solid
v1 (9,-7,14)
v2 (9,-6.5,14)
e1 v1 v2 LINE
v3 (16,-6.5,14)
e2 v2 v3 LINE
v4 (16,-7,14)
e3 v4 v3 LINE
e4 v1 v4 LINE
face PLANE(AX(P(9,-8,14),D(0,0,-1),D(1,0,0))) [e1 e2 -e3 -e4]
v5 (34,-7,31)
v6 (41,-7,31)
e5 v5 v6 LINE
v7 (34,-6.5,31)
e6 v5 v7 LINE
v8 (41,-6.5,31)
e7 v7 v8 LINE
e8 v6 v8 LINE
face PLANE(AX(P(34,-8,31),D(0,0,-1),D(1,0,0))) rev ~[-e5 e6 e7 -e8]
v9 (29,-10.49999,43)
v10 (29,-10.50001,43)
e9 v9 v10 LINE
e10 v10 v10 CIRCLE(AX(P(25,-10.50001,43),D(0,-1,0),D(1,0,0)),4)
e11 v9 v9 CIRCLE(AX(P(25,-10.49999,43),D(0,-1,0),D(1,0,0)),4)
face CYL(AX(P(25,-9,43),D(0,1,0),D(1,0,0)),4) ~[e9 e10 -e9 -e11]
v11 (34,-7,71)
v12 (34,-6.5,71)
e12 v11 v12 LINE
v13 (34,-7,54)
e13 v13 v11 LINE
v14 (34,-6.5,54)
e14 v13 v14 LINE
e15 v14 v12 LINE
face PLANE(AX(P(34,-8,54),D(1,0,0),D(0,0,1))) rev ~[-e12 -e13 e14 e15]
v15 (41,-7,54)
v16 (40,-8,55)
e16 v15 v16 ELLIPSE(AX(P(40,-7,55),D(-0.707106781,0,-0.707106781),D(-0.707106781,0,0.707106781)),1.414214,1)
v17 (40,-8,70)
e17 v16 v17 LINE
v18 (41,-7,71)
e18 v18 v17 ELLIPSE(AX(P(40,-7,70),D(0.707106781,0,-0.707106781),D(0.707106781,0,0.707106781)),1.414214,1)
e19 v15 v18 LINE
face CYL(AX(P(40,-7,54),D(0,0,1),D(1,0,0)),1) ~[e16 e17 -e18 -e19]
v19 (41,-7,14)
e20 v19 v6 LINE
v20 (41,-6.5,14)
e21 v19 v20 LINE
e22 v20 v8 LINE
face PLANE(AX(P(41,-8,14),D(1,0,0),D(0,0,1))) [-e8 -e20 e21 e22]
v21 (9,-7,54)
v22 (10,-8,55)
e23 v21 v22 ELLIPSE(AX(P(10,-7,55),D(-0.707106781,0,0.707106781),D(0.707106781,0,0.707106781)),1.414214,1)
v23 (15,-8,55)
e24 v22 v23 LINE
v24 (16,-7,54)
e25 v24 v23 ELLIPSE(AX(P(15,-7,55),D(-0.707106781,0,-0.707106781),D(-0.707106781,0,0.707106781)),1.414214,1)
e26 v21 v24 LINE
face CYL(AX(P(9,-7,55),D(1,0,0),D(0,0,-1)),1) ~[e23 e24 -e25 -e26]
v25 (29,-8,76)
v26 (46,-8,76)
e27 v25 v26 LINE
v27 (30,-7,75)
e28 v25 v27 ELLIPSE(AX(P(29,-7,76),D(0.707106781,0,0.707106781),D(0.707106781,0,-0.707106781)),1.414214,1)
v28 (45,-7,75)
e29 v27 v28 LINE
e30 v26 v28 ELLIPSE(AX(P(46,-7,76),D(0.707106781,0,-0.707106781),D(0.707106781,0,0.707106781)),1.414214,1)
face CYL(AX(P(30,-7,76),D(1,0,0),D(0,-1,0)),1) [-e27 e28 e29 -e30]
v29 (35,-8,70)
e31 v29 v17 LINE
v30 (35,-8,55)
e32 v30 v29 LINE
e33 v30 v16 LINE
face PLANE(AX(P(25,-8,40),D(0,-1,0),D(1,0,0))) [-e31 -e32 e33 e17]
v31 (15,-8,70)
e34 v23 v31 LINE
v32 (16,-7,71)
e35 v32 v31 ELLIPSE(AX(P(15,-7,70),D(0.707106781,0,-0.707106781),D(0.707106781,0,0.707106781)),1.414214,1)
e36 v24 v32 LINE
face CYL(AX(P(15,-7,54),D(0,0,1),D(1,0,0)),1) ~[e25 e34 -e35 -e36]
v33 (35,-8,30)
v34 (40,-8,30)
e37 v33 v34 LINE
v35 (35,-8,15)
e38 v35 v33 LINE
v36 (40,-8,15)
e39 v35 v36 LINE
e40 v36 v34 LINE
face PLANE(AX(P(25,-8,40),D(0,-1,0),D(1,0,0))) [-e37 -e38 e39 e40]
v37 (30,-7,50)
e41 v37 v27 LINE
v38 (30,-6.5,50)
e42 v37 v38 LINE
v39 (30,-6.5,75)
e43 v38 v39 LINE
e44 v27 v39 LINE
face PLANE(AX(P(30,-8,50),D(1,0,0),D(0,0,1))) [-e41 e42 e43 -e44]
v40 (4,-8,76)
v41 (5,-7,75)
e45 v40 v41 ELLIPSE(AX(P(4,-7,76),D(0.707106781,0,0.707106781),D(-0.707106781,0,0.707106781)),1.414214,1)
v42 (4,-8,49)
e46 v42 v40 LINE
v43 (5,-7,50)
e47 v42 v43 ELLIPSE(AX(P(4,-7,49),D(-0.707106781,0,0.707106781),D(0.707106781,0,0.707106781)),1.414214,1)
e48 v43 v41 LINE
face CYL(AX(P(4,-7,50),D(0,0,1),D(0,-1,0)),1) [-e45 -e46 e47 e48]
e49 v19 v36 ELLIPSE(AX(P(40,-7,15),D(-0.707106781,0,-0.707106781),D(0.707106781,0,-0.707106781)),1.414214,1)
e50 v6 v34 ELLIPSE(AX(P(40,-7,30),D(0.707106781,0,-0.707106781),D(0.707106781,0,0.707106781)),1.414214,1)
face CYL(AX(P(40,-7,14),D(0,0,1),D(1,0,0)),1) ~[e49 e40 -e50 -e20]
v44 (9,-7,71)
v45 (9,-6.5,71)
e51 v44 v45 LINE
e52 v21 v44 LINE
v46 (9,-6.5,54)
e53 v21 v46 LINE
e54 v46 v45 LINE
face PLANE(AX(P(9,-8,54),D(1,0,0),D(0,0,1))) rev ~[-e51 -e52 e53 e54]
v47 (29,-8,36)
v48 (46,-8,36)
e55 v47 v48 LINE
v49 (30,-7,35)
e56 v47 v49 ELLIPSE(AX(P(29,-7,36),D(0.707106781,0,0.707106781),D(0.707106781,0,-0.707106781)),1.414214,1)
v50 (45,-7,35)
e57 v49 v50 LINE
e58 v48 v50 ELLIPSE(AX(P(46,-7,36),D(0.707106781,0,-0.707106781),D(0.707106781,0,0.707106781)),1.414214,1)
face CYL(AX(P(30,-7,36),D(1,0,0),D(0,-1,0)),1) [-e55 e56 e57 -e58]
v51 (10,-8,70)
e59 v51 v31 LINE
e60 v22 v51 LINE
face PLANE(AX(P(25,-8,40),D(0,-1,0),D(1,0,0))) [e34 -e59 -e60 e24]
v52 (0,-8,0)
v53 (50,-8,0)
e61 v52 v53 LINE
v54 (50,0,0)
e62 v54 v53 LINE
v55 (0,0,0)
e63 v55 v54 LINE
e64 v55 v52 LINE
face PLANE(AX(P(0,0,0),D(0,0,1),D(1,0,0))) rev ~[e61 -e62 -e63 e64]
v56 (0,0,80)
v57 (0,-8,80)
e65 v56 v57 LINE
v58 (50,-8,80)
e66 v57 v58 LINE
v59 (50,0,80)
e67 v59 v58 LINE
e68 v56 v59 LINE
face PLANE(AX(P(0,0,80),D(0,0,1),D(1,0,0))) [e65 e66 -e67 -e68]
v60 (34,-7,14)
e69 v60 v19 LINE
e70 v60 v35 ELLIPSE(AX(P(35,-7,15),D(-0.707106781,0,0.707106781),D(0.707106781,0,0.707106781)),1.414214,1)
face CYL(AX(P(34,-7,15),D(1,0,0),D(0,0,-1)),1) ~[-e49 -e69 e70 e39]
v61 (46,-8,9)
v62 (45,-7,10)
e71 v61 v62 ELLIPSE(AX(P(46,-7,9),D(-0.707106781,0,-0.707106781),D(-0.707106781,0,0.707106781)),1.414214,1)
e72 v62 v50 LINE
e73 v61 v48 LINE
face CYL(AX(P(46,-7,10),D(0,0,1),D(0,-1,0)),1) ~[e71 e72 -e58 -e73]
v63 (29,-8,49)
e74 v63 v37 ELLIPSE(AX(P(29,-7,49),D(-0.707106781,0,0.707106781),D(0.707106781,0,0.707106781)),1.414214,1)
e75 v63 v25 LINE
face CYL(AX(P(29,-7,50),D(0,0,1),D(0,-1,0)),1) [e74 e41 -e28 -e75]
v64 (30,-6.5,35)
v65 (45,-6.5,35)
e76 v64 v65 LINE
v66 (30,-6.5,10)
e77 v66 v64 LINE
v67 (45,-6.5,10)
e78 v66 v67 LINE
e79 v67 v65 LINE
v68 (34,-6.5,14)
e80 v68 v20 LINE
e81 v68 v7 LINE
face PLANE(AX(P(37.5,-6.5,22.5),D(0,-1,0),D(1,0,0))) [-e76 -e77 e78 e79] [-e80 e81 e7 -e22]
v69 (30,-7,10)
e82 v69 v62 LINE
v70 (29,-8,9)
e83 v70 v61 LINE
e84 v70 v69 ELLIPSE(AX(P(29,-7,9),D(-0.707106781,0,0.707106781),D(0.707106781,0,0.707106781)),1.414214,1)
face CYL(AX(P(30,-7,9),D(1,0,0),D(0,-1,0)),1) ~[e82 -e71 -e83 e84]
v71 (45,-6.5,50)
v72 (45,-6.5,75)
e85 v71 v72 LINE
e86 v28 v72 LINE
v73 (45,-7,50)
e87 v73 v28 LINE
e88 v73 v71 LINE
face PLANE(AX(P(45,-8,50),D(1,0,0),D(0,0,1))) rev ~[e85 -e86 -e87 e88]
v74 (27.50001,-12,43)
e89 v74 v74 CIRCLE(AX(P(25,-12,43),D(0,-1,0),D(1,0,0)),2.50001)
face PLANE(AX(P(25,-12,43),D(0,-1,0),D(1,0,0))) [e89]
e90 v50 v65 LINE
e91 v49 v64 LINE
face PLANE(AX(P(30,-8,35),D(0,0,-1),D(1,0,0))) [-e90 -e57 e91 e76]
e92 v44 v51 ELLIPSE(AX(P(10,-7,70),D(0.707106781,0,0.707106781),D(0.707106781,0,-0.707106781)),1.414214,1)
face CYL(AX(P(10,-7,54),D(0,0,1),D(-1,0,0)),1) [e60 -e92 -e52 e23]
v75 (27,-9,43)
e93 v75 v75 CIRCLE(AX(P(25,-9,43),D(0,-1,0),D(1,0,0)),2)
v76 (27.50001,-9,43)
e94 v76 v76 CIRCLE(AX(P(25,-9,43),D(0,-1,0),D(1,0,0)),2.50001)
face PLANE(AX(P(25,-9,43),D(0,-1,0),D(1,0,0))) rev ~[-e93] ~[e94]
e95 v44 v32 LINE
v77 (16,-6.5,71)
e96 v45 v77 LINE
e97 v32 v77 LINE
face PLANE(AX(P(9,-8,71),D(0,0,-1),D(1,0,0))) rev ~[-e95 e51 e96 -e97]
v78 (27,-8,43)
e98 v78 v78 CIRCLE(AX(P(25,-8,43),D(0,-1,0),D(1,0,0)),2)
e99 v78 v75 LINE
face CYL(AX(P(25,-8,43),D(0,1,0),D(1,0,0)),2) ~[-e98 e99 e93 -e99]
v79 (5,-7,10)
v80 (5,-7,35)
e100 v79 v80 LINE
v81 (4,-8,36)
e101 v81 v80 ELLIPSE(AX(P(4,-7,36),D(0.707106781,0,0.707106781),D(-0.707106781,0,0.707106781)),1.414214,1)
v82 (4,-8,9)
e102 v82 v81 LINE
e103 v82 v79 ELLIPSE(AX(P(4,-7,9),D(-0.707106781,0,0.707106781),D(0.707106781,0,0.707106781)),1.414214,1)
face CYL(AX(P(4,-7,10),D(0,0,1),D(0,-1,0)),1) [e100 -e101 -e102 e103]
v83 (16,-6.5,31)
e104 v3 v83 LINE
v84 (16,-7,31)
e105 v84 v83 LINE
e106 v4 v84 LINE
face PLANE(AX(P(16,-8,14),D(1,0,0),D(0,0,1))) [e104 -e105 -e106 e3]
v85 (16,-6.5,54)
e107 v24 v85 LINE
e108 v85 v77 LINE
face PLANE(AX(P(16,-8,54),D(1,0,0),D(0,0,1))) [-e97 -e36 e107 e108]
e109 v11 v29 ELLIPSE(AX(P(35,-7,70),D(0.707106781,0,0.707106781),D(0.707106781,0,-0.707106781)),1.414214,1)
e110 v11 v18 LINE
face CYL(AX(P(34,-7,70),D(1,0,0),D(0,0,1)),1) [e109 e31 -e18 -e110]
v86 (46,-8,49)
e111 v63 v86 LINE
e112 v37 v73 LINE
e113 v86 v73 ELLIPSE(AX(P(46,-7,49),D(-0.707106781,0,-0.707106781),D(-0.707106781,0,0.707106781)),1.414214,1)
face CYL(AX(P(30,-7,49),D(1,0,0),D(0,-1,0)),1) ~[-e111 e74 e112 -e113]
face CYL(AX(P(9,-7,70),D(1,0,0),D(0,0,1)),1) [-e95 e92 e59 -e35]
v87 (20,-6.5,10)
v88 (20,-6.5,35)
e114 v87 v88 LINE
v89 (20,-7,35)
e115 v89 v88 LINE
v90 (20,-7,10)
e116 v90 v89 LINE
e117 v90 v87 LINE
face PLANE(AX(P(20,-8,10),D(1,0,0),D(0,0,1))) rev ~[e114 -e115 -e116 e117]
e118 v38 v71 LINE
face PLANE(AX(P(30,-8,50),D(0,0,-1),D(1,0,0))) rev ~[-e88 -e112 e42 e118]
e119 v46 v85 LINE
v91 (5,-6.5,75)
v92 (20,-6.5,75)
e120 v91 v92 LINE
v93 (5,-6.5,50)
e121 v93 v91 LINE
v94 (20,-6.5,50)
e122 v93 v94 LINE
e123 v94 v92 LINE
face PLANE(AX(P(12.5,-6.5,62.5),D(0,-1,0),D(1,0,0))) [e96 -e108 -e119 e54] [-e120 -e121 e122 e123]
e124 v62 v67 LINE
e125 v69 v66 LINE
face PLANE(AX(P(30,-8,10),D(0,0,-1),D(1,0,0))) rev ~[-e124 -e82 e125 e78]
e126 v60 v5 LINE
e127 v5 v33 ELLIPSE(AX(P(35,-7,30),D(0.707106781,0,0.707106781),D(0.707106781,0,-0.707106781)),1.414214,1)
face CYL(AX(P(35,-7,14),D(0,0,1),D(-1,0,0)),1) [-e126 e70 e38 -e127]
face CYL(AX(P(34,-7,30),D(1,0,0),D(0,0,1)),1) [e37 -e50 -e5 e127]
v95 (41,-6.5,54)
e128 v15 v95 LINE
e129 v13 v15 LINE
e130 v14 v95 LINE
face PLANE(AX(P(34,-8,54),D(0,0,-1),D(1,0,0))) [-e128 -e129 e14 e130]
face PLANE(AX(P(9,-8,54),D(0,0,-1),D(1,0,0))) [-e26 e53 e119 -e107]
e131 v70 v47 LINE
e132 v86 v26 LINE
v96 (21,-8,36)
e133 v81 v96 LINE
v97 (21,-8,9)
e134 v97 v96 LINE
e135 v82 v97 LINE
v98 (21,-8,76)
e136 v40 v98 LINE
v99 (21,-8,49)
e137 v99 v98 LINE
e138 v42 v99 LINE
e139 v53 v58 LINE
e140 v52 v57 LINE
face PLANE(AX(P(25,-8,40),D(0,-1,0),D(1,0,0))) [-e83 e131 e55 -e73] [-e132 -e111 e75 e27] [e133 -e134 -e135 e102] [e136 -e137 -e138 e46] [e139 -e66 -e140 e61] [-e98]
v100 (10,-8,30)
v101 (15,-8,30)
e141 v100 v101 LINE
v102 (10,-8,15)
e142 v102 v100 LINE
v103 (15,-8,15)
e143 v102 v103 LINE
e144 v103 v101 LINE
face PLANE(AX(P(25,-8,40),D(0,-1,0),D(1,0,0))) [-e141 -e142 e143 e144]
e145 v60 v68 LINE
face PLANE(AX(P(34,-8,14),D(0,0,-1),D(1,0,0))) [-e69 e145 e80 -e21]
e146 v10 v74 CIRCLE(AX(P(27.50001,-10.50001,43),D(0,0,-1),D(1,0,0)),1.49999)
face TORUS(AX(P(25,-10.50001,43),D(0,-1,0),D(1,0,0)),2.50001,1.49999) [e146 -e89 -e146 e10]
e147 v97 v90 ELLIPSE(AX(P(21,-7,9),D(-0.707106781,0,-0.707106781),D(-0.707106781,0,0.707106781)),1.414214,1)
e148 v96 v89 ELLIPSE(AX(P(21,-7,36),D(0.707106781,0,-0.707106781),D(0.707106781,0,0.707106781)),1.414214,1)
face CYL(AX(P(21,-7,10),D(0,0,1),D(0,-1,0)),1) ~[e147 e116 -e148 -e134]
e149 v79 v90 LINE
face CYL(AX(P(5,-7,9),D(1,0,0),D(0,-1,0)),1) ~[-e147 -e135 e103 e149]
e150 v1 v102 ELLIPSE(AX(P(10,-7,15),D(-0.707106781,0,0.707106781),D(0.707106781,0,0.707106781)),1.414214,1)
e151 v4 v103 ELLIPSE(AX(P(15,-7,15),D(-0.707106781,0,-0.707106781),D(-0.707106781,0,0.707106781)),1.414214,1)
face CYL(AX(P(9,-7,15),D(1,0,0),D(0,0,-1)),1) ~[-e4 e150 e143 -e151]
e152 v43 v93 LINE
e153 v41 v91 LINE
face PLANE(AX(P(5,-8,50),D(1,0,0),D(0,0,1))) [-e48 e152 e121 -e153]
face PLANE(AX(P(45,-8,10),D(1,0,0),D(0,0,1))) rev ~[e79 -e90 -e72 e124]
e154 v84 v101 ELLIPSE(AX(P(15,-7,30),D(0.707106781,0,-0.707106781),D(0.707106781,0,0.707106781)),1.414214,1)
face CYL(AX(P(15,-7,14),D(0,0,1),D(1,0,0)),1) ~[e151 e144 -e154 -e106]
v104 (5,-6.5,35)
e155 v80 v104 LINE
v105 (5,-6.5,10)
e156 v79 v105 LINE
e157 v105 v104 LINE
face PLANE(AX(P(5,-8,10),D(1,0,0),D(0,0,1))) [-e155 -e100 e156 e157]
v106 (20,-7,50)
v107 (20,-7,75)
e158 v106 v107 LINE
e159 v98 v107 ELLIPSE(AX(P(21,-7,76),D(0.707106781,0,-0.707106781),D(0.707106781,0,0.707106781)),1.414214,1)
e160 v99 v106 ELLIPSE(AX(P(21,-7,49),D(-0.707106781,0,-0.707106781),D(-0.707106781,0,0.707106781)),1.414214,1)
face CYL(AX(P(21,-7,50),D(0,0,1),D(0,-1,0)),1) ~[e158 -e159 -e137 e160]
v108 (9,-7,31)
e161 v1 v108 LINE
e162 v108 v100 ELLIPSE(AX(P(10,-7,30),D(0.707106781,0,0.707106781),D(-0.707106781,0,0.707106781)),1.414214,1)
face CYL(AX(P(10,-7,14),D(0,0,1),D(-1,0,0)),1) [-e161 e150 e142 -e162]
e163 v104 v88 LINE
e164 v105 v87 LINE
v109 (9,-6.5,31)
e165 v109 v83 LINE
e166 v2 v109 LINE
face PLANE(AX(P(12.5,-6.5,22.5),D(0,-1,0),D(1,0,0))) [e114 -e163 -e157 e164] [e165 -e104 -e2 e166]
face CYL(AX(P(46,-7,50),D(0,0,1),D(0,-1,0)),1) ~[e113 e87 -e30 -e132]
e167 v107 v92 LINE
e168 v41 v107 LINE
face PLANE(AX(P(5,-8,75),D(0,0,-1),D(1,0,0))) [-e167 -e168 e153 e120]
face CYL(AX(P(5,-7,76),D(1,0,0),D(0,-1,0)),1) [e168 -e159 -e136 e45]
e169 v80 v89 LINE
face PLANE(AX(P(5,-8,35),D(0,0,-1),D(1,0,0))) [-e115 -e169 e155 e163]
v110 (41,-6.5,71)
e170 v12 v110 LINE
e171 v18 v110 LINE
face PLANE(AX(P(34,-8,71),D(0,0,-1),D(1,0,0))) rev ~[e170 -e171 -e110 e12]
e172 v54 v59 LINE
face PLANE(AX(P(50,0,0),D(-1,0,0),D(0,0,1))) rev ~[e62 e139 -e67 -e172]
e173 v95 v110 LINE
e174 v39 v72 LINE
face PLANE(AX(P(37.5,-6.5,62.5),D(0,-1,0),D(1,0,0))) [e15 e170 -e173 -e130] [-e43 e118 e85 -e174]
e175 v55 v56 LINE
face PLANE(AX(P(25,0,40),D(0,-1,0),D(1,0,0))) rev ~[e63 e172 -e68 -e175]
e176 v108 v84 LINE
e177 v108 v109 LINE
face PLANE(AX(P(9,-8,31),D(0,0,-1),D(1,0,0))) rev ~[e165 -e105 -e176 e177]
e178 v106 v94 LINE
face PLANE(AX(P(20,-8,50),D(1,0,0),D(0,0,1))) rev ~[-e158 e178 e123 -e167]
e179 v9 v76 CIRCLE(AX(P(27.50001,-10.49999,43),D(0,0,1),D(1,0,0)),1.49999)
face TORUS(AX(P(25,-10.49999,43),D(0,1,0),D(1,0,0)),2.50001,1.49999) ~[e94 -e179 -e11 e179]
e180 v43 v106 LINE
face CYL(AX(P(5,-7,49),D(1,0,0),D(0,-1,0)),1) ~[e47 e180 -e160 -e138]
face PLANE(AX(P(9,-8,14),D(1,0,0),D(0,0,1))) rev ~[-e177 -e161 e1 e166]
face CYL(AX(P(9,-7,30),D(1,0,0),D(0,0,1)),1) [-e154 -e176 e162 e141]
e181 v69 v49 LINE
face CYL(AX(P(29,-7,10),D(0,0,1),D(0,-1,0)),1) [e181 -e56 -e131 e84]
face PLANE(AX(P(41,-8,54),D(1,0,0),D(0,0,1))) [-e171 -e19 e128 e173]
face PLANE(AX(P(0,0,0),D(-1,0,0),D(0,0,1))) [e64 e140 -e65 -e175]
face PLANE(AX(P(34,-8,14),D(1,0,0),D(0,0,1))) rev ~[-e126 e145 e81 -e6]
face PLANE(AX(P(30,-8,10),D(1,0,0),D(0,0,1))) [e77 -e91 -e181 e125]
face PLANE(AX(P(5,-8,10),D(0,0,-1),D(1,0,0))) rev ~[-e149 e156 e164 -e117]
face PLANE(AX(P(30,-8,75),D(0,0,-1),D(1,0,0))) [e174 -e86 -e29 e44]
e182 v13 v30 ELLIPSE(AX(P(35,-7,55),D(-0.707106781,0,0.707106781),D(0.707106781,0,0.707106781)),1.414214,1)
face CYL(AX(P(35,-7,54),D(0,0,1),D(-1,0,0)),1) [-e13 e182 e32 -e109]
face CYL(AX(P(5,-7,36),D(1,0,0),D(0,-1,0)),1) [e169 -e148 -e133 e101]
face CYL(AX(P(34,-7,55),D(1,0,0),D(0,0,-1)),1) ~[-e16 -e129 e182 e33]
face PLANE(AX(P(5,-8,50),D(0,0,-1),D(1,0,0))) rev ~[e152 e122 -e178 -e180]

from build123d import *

# Parameters (mm, degrees)
F0_W     = 50
F0_H     = 80
F1_DEPTH = 8
F2_W     = 15
F2_H     = 25
F2_W_2   = 7
F2_H_2   = 17
F3_DEPTH = 1.5
F4_R     = 1
F5_R     = 2
F6_DEPTH = 1
F7_R     = 4
F7_R_2   = 2
F8_DEPTH = 3
F9_R     = 1.49999


# Not quite as in the source:
# - a fillet or chamfer is up to 0.001 mm smaller than in the source, because OpenCascade refuses the exact size


with BuildPart() as f1:
    # F0 (on Front) → F1 (new body)
    with BuildSketch(Plane.XZ):
        with Locations((25, 40)):
            Rectangle(F0_W, F0_H)
    extrude(amount=F1_DEPTH)

    # F2 (on face) → F3 (cut)
    with BuildSketch(Plane.XZ.offset(8)):
        with Locations((12.5, 62.5)):
            Rectangle(F2_W, F2_H)
        with Locations((12.5, 62.5)):
            Rectangle(F2_W_2, F2_H_2, mode=Mode.SUBTRACT)
        with Locations((37.5, 62.5)):
            Rectangle(F2_W, F2_H)
        with Locations((37.5, 62.5)):
            Rectangle(F2_W_2, F2_H_2, mode=Mode.SUBTRACT)
        with Locations((12.5, 22.5)):
            Rectangle(F2_W, F2_H)
        with Locations((12.5, 22.5)):
            Rectangle(F2_W_2, F2_H_2, mode=Mode.SUBTRACT)
        with Locations((37.5, 22.5)):
            Rectangle(F2_W, F2_H)
        with Locations((37.5, 22.5)):
            Rectangle(F2_W_2, F2_H_2, mode=Mode.SUBTRACT)
    extrude(amount=-F3_DEPTH, mode=Mode.SUBTRACT)

    # F4
    f4_edges = [f1.edges().sort_by_distance(p)[0] for p in [
        (16, -8, 62.5),
        (12.5, -8, 71),
        (9, -8, 62.5),
        (12.5, -8, 54),
        (5, -8, 62.5),
        (12.5, -8, 75),
        (20, -8, 62.5),
        (12.5, -8, 50),
        (37.5, -8, 75),
        (45, -8, 62.5),
        (37.5, -8, 71),
        (30, -8, 62.5),
        (34, -8, 62.5),
        (41, -8, 62.5),
        (37.5, -8, 54),
        (37.5, -8, 50),
        (37.5, -8, 35),
        (37.5, -8, 31),
        (34, -8, 22.5),
        (37.5, -8, 14),
        (41, -8, 22.5),
        (45, -8, 22.5),
        (37.5, -8, 10),
        (30, -8, 22.5),
        (20, -8, 22.5),
        (16, -8, 22.5),
        (9, -8, 22.5),
        (5, -8, 22.5),
        (12.5, -8, 35),
        (12.5, -8, 31),
        (12.5, -8, 14),
        (12.5, -8, 10),
    ]]
    fillet(f4_edges, radius=F4_R)

    # F5 (on face) → F6 (join)
    with BuildSketch(Plane.XZ.offset(8)):
        with Locations((25, 43)):
            Circle(F5_R)
    extrude(amount=F6_DEPTH)

    # F7 (on face) → F8 (join)
    with BuildSketch(Plane.XZ.offset(9)):
        with Locations((25, 43)):
            Circle(F7_R)
        with Locations((25, 43)):
            Circle(F7_R_2, mode=Mode.SUBTRACT)
        with Locations((25, 43)):
            Circle(F7_R_2)
    extrude(amount=F8_DEPTH)

    # F9 (radius 1.5 in the source; OpenCascade refuses exactly that, so slightly less here)
    f9_edges = [f1.edges().sort_by_distance(p)[0] for p in [
        (21, -12, 43),
        (21, -9, 43),
    ]]
    fillet(f9_edges, radius=F9_R)


solid = f1.part
